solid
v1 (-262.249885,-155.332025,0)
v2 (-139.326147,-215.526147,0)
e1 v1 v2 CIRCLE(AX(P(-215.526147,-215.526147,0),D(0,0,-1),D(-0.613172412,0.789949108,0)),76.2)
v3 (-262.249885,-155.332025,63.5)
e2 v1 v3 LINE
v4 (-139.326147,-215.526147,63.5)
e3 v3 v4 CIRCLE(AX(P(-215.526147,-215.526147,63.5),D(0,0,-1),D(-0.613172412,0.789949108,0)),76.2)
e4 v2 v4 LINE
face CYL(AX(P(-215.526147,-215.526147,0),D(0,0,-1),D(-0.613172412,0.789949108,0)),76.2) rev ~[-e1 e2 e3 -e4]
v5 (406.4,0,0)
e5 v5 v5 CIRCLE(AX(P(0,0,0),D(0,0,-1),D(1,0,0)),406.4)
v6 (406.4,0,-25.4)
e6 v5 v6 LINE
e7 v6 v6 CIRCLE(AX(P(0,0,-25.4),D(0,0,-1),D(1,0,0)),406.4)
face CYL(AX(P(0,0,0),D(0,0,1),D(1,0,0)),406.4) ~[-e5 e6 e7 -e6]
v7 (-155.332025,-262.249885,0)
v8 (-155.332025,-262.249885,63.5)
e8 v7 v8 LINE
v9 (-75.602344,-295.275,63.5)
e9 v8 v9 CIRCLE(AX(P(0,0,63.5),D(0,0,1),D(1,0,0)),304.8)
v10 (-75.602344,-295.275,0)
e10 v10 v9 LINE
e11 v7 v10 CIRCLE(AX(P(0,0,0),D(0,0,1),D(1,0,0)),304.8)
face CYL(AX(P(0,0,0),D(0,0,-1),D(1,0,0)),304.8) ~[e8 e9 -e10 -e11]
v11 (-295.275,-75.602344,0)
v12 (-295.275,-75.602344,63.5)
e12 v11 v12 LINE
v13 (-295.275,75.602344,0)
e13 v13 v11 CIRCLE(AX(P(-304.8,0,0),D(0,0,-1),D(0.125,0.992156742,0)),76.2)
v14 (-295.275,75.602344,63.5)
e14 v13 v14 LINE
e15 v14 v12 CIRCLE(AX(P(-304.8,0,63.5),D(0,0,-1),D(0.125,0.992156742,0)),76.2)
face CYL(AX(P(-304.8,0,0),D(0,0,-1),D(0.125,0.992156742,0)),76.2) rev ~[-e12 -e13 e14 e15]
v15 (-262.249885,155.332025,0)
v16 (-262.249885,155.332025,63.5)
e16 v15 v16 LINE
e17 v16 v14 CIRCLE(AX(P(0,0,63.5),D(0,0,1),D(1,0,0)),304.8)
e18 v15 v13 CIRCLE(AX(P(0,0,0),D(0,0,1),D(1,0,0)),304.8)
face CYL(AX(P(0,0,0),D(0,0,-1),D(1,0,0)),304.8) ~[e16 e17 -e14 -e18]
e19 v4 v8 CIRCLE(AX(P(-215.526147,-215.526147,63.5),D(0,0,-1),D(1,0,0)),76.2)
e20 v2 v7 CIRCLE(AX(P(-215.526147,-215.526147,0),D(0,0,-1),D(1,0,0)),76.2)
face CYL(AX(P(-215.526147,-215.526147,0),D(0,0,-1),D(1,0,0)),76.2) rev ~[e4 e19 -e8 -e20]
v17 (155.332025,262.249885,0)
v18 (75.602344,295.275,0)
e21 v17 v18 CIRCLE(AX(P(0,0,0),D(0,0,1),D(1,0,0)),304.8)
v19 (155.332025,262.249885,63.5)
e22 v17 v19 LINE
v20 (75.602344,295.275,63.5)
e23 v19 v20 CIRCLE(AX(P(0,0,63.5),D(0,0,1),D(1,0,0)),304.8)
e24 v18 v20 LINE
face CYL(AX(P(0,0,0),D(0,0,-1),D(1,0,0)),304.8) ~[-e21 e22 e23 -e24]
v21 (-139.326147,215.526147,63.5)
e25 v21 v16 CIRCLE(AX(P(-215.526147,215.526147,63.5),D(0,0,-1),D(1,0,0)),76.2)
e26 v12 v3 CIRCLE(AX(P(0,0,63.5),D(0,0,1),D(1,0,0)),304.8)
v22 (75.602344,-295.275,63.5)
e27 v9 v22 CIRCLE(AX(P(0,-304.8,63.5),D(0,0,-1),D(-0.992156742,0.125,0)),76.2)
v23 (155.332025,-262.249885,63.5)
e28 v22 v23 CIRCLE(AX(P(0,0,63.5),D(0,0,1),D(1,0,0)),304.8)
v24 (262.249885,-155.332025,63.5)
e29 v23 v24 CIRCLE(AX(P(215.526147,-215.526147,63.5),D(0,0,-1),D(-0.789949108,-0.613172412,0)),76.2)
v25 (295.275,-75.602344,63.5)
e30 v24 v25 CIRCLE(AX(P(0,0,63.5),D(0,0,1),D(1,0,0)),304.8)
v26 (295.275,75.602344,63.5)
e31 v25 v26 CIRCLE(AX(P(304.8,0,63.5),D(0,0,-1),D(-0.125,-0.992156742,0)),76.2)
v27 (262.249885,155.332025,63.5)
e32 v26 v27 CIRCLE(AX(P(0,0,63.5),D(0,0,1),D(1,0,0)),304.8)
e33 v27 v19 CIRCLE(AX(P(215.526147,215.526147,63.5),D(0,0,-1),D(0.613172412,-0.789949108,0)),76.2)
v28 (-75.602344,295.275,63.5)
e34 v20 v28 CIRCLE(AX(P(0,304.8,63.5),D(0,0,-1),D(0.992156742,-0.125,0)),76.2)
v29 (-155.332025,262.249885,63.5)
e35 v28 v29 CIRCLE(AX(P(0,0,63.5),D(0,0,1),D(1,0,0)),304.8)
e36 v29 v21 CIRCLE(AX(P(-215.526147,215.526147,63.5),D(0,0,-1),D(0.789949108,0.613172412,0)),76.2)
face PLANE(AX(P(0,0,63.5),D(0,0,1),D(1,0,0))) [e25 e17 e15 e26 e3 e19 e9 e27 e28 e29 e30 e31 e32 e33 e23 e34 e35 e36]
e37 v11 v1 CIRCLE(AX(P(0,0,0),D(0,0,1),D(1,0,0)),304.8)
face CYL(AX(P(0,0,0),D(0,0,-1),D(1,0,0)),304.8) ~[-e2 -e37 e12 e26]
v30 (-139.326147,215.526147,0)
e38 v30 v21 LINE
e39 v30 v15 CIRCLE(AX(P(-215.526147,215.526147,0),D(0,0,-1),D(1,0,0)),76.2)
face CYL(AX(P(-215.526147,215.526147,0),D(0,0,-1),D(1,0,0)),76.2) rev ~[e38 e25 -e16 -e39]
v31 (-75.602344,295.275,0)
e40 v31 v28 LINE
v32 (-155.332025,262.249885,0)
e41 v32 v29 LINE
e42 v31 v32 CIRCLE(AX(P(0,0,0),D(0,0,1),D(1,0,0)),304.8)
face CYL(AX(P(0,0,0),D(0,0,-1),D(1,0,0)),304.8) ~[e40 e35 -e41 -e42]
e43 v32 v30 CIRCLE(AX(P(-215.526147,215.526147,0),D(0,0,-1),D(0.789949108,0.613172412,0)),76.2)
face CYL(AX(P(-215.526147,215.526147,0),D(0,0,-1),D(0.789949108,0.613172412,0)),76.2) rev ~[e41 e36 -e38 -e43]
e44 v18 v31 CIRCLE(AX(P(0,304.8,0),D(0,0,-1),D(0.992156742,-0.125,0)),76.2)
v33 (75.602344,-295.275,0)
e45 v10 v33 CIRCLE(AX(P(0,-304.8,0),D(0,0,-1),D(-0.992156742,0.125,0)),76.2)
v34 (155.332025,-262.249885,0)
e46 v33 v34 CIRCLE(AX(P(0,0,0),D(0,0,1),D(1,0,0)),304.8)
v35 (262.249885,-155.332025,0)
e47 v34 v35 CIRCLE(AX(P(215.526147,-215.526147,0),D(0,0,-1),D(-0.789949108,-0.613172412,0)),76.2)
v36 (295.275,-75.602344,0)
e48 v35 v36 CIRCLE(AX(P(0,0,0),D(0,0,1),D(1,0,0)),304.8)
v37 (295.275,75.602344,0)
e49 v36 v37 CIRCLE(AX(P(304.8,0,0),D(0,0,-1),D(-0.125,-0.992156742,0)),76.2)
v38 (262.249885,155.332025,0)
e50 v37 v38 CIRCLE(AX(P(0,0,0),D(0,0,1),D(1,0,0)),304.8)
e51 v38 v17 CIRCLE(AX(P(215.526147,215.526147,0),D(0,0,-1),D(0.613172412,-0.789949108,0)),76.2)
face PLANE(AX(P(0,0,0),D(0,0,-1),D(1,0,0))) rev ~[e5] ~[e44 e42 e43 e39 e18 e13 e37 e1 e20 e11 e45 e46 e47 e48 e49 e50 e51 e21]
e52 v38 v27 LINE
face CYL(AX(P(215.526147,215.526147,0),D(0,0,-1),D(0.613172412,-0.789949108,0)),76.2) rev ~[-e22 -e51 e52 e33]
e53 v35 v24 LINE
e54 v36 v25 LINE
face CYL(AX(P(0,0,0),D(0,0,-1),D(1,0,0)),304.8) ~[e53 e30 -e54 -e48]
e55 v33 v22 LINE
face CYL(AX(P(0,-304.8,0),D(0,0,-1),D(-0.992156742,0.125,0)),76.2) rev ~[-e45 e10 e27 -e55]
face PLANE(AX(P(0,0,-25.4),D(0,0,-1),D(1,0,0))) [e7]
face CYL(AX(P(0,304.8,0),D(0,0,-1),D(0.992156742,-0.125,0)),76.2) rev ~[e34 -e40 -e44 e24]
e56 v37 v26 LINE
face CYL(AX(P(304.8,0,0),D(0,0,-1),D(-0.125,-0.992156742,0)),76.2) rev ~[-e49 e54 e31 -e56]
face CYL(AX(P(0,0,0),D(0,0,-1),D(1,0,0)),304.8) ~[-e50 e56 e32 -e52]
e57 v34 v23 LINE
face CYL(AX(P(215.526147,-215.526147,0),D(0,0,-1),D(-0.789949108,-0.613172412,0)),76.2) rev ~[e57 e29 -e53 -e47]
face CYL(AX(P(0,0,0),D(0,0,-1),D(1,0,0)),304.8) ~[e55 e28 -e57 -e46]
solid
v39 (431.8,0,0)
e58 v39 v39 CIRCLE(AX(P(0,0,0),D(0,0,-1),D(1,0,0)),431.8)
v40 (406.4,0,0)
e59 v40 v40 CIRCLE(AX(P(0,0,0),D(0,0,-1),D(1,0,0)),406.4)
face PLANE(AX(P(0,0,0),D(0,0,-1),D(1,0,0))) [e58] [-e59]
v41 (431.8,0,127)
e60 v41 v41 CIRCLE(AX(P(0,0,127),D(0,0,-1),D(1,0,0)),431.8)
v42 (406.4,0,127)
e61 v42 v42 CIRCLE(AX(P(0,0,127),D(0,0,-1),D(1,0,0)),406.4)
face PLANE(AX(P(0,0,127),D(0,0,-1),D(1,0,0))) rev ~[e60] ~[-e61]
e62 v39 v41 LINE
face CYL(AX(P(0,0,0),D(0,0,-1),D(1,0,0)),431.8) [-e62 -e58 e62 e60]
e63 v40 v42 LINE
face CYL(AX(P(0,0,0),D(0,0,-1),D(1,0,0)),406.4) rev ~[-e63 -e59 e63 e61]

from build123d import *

# Parameters (mm, degrees)
F0_R     = 304.8
F1_DEPTH = 63.5
F3_DEPTH = 480.06
F5_R     = 406.4
F6_DEPTH = 25.4
F5_R_2   = 431.8
F7_DEPTH = 127


with BuildPart() as f1:
    # F0 (on Top) → F1 (new body)
    with BuildSketch(Plane.XY):
        Circle(F0_R)
    extrude(amount=F1_DEPTH)

    # F2 (on face) → F3 (cut)
    with BuildSketch(Plane(origin=(0, 0, 0), x_dir=(1, 0, 0), z_dir=(0, 0, -1))):
        with BuildLine():
            ThreePointArc((75.6023437137, 295.275), (0, 304.8), (-75.6023437137, 295.275))
            ThreePointArc((-75.6023437137, 295.275), (0, 228.6), (75.6023437137, 295.275))
        make_face()
        with BuildLine():
            ThreePointArc((-139.3261469057, 215.5261469057), (-143.4385886978, 240.220760724), (-155.3320249013, 262.2498847284))
            ThreePointArc((-155.3320249013, 262.2498847284), (-215.5261469057, 215.5261469057), (-262.2498847284, 155.3320249013))
            ThreePointArc((-262.2498847284, 155.3320249013), (-182.0142745474, 147.090816768), (-139.3261469057, 215.5261469057))
        make_face()
        with BuildLine():
            ThreePointArc((-228.6, 0), (-247.65, 50.4015624758), (-295.275, 75.6023437137))
            ThreePointArc((-295.275, 75.6023437137), (-304.8, 0), (-295.275, -75.6023437137))
            ThreePointArc((-295.275, -75.6023437137), (-247.65, -50.4015624758), (-228.6, 0))
        make_face()
        with BuildLine():
            ThreePointArc((-139.3261469057, -215.5261469057), (-182.0142745474, -147.090816768), (-262.2498847284, -155.3320249013))
            ThreePointArc((-262.2498847284, -155.3320249013), (-215.5261469057, -215.5261469057), (-155.3320249013, -262.2498847284))
            ThreePointArc((-155.3320249013, -262.2498847284), (-143.4385886978, -240.220760724), (-139.3261469057, -215.5261469057))
        make_face()
        with BuildLine():
            ThreePointArc((75.6023437137, -295.275), (0, -228.6), (-75.6023437137, -295.275))
            ThreePointArc((-75.6023437137, -295.275), (0, -304.8), (75.6023437137, -295.275))
        make_face()
        with BuildLine():
            ThreePointArc((155.3320249013, -262.2498847284), (215.5261469057, -215.5261469057), (262.2498847284, -155.3320249013))
            ThreePointArc((262.2498847284, -155.3320249013), (161.6446101792, -161.6446101792), (155.3320249013, -262.2498847284))
        make_face()
        with BuildLine():
            ThreePointArc((304.8, 0), (302.4093748547, 38.1), (295.275, 75.6023437137))
            ThreePointArc((295.275, 75.6023437137), (228.6, 0), (295.275, -75.6023437137))
            ThreePointArc((295.275, -75.6023437137), (302.4093748547, -38.1), (304.8, 0))
        make_face()
        with BuildLine():
            ThreePointArc((262.2498847284, 155.3320249013), (215.5261469057, 215.5261469057), (155.3320249013, 262.2498847284))
            ThreePointArc((155.3320249013, 262.2498847284), (161.6446101792, 161.6446101792), (262.2498847284, 155.3320249013))
        make_face()
    extrude(amount=-F3_DEPTH, mode=Mode.SUBTRACT)

    # F5 (on face) → F6 (join)
    with BuildSketch(Plane(origin=(0, 0, 0), x_dir=(1, 0, 0), z_dir=(0, 0, -1))):
        Circle(F5_R)
        with BuildLine():
            ThreePointArc((262.2498847284, 155.3320249013), (281.5984815094, 116.6419101849), (295.275, 75.6023437137))
            ThreePointArc((295.275, 75.6023437137), (228.6, 0), (295.275, -75.6023437137))
            ThreePointArc((295.275, -75.6023437137), (281.5984815094, -116.6419101849), (262.2498847284, -155.3320249013))
            ThreePointArc((262.2498847284, -155.3320249013), (161.6446101792, -161.6446101792), (155.3320249013, -262.2498847284))
            ThreePointArc((155.3320249013, -262.2498847284), (116.6419101849, -281.5984815094), (75.6023437137, -295.275))
            ThreePointArc((75.6023437137, -295.275), (0, -228.6), (-75.6023437137, -295.275))
            ThreePointArc((-75.6023437137, -295.275), (-116.6419101849, -281.5984815094), (-155.3320249013, -262.2498847284))
            ThreePointArc((-155.3320249013, -262.2498847284), (-161.6446101792, -161.6446101792), (-262.2498847284, -155.3320249013))
            ThreePointArc((-262.2498847284, -155.3320249013), (-281.5984815094, -116.6419101849), (-295.275, -75.6023437137))
            ThreePointArc((-295.275, -75.6023437137), (-228.6, 0), (-295.275, 75.6023437137))
            ThreePointArc((-295.275, 75.6023437137), (-281.5984815094, 116.6419101849), (-262.2498847284, 155.3320249013))
            ThreePointArc((-262.2498847284, 155.3320249013), (-161.6446101792, 161.6446101792), (-155.3320249013, 262.2498847284))
            ThreePointArc((-155.3320249013, 262.2498847284), (-116.6419101849, 281.5984815094), (-75.6023437137, 295.275))
            ThreePointArc((-75.6023437137, 295.275), (0, 228.6), (75.6023437137, 295.275))
            ThreePointArc((75.6023437137, 295.275), (116.6419101849, 281.5984815094), (155.3320249013, 262.2498847284))
            ThreePointArc((155.3320249013, 262.2498847284), (161.6446101792, 161.6446101792), (262.2498847284, 155.3320249013))
        make_face(mode=Mode.SUBTRACT)
        with BuildLine():
            ThreePointArc((295.275, -75.6023437137), (228.6, 0), (295.275, 75.6023437137))
            ThreePointArc((295.275, 75.6023437137), (281.5984815094, 116.6419101849), (262.2498847284, 155.3320249013))
            ThreePointArc((262.2498847284, 155.3320249013), (161.6446101792, 161.6446101792), (155.3320249013, 262.2498847284))
            ThreePointArc((155.3320249013, 262.2498847284), (116.6419101849, 281.5984815094), (75.6023437137, 295.275))
            ThreePointArc((75.6023437137, 295.275), (0, 228.6), (-75.6023437137, 295.275))
            ThreePointArc((-75.6023437137, 295.275), (-116.6419101849, 281.5984815094), (-155.3320249013, 262.2498847284))
            ThreePointArc((-155.3320249013, 262.2498847284), (-161.6446101792, 161.6446101792), (-262.2498847284, 155.3320249013))
            ThreePointArc((-262.2498847284, 155.3320249013), (-281.5984815094, 116.6419101849), (-295.275, 75.6023437137))
            ThreePointArc((-295.275, 75.6023437137), (-228.6, 0), (-295.275, -75.6023437137))
            ThreePointArc((-295.275, -75.6023437137), (-281.5984815094, -116.6419101849), (-262.2498847284, -155.3320249013))
            ThreePointArc((-262.2498847284, -155.3320249013), (-161.6446101792, -161.6446101792), (-155.3320249013, -262.2498847284))
            ThreePointArc((-155.3320249013, -262.2498847284), (-116.6419101849, -281.5984815094), (-75.6023437137, -295.275))
            ThreePointArc((-75.6023437137, -295.275), (0, -228.6), (75.6023437137, -295.275))
            ThreePointArc((75.6023437137, -295.275), (116.6419101849, -281.5984815094), (155.3320249013, -262.2498847284))
            ThreePointArc((155.3320249013, -262.2498847284), (161.6446101792, -161.6446101792), (262.2498847284, -155.3320249013))
            ThreePointArc((262.2498847284, -155.3320249013), (281.5984815094, -116.6419101849), (295.275, -75.6023437137))
        make_face()
    extrude(amount=F6_DEPTH)


with BuildPart() as f7:
    # F5 (on face) → F7 (new body)
    with BuildSketch(Plane(origin=(0, 0, 0), x_dir=(1, 0, 0), z_dir=(0, 0, -1))):
        Circle(F5_R_2)
        Circle(F5_R, mode=Mode.SUBTRACT)
    extrude(amount=-F7_DEPTH)


solid = Compound([f1.part, f7.part])
